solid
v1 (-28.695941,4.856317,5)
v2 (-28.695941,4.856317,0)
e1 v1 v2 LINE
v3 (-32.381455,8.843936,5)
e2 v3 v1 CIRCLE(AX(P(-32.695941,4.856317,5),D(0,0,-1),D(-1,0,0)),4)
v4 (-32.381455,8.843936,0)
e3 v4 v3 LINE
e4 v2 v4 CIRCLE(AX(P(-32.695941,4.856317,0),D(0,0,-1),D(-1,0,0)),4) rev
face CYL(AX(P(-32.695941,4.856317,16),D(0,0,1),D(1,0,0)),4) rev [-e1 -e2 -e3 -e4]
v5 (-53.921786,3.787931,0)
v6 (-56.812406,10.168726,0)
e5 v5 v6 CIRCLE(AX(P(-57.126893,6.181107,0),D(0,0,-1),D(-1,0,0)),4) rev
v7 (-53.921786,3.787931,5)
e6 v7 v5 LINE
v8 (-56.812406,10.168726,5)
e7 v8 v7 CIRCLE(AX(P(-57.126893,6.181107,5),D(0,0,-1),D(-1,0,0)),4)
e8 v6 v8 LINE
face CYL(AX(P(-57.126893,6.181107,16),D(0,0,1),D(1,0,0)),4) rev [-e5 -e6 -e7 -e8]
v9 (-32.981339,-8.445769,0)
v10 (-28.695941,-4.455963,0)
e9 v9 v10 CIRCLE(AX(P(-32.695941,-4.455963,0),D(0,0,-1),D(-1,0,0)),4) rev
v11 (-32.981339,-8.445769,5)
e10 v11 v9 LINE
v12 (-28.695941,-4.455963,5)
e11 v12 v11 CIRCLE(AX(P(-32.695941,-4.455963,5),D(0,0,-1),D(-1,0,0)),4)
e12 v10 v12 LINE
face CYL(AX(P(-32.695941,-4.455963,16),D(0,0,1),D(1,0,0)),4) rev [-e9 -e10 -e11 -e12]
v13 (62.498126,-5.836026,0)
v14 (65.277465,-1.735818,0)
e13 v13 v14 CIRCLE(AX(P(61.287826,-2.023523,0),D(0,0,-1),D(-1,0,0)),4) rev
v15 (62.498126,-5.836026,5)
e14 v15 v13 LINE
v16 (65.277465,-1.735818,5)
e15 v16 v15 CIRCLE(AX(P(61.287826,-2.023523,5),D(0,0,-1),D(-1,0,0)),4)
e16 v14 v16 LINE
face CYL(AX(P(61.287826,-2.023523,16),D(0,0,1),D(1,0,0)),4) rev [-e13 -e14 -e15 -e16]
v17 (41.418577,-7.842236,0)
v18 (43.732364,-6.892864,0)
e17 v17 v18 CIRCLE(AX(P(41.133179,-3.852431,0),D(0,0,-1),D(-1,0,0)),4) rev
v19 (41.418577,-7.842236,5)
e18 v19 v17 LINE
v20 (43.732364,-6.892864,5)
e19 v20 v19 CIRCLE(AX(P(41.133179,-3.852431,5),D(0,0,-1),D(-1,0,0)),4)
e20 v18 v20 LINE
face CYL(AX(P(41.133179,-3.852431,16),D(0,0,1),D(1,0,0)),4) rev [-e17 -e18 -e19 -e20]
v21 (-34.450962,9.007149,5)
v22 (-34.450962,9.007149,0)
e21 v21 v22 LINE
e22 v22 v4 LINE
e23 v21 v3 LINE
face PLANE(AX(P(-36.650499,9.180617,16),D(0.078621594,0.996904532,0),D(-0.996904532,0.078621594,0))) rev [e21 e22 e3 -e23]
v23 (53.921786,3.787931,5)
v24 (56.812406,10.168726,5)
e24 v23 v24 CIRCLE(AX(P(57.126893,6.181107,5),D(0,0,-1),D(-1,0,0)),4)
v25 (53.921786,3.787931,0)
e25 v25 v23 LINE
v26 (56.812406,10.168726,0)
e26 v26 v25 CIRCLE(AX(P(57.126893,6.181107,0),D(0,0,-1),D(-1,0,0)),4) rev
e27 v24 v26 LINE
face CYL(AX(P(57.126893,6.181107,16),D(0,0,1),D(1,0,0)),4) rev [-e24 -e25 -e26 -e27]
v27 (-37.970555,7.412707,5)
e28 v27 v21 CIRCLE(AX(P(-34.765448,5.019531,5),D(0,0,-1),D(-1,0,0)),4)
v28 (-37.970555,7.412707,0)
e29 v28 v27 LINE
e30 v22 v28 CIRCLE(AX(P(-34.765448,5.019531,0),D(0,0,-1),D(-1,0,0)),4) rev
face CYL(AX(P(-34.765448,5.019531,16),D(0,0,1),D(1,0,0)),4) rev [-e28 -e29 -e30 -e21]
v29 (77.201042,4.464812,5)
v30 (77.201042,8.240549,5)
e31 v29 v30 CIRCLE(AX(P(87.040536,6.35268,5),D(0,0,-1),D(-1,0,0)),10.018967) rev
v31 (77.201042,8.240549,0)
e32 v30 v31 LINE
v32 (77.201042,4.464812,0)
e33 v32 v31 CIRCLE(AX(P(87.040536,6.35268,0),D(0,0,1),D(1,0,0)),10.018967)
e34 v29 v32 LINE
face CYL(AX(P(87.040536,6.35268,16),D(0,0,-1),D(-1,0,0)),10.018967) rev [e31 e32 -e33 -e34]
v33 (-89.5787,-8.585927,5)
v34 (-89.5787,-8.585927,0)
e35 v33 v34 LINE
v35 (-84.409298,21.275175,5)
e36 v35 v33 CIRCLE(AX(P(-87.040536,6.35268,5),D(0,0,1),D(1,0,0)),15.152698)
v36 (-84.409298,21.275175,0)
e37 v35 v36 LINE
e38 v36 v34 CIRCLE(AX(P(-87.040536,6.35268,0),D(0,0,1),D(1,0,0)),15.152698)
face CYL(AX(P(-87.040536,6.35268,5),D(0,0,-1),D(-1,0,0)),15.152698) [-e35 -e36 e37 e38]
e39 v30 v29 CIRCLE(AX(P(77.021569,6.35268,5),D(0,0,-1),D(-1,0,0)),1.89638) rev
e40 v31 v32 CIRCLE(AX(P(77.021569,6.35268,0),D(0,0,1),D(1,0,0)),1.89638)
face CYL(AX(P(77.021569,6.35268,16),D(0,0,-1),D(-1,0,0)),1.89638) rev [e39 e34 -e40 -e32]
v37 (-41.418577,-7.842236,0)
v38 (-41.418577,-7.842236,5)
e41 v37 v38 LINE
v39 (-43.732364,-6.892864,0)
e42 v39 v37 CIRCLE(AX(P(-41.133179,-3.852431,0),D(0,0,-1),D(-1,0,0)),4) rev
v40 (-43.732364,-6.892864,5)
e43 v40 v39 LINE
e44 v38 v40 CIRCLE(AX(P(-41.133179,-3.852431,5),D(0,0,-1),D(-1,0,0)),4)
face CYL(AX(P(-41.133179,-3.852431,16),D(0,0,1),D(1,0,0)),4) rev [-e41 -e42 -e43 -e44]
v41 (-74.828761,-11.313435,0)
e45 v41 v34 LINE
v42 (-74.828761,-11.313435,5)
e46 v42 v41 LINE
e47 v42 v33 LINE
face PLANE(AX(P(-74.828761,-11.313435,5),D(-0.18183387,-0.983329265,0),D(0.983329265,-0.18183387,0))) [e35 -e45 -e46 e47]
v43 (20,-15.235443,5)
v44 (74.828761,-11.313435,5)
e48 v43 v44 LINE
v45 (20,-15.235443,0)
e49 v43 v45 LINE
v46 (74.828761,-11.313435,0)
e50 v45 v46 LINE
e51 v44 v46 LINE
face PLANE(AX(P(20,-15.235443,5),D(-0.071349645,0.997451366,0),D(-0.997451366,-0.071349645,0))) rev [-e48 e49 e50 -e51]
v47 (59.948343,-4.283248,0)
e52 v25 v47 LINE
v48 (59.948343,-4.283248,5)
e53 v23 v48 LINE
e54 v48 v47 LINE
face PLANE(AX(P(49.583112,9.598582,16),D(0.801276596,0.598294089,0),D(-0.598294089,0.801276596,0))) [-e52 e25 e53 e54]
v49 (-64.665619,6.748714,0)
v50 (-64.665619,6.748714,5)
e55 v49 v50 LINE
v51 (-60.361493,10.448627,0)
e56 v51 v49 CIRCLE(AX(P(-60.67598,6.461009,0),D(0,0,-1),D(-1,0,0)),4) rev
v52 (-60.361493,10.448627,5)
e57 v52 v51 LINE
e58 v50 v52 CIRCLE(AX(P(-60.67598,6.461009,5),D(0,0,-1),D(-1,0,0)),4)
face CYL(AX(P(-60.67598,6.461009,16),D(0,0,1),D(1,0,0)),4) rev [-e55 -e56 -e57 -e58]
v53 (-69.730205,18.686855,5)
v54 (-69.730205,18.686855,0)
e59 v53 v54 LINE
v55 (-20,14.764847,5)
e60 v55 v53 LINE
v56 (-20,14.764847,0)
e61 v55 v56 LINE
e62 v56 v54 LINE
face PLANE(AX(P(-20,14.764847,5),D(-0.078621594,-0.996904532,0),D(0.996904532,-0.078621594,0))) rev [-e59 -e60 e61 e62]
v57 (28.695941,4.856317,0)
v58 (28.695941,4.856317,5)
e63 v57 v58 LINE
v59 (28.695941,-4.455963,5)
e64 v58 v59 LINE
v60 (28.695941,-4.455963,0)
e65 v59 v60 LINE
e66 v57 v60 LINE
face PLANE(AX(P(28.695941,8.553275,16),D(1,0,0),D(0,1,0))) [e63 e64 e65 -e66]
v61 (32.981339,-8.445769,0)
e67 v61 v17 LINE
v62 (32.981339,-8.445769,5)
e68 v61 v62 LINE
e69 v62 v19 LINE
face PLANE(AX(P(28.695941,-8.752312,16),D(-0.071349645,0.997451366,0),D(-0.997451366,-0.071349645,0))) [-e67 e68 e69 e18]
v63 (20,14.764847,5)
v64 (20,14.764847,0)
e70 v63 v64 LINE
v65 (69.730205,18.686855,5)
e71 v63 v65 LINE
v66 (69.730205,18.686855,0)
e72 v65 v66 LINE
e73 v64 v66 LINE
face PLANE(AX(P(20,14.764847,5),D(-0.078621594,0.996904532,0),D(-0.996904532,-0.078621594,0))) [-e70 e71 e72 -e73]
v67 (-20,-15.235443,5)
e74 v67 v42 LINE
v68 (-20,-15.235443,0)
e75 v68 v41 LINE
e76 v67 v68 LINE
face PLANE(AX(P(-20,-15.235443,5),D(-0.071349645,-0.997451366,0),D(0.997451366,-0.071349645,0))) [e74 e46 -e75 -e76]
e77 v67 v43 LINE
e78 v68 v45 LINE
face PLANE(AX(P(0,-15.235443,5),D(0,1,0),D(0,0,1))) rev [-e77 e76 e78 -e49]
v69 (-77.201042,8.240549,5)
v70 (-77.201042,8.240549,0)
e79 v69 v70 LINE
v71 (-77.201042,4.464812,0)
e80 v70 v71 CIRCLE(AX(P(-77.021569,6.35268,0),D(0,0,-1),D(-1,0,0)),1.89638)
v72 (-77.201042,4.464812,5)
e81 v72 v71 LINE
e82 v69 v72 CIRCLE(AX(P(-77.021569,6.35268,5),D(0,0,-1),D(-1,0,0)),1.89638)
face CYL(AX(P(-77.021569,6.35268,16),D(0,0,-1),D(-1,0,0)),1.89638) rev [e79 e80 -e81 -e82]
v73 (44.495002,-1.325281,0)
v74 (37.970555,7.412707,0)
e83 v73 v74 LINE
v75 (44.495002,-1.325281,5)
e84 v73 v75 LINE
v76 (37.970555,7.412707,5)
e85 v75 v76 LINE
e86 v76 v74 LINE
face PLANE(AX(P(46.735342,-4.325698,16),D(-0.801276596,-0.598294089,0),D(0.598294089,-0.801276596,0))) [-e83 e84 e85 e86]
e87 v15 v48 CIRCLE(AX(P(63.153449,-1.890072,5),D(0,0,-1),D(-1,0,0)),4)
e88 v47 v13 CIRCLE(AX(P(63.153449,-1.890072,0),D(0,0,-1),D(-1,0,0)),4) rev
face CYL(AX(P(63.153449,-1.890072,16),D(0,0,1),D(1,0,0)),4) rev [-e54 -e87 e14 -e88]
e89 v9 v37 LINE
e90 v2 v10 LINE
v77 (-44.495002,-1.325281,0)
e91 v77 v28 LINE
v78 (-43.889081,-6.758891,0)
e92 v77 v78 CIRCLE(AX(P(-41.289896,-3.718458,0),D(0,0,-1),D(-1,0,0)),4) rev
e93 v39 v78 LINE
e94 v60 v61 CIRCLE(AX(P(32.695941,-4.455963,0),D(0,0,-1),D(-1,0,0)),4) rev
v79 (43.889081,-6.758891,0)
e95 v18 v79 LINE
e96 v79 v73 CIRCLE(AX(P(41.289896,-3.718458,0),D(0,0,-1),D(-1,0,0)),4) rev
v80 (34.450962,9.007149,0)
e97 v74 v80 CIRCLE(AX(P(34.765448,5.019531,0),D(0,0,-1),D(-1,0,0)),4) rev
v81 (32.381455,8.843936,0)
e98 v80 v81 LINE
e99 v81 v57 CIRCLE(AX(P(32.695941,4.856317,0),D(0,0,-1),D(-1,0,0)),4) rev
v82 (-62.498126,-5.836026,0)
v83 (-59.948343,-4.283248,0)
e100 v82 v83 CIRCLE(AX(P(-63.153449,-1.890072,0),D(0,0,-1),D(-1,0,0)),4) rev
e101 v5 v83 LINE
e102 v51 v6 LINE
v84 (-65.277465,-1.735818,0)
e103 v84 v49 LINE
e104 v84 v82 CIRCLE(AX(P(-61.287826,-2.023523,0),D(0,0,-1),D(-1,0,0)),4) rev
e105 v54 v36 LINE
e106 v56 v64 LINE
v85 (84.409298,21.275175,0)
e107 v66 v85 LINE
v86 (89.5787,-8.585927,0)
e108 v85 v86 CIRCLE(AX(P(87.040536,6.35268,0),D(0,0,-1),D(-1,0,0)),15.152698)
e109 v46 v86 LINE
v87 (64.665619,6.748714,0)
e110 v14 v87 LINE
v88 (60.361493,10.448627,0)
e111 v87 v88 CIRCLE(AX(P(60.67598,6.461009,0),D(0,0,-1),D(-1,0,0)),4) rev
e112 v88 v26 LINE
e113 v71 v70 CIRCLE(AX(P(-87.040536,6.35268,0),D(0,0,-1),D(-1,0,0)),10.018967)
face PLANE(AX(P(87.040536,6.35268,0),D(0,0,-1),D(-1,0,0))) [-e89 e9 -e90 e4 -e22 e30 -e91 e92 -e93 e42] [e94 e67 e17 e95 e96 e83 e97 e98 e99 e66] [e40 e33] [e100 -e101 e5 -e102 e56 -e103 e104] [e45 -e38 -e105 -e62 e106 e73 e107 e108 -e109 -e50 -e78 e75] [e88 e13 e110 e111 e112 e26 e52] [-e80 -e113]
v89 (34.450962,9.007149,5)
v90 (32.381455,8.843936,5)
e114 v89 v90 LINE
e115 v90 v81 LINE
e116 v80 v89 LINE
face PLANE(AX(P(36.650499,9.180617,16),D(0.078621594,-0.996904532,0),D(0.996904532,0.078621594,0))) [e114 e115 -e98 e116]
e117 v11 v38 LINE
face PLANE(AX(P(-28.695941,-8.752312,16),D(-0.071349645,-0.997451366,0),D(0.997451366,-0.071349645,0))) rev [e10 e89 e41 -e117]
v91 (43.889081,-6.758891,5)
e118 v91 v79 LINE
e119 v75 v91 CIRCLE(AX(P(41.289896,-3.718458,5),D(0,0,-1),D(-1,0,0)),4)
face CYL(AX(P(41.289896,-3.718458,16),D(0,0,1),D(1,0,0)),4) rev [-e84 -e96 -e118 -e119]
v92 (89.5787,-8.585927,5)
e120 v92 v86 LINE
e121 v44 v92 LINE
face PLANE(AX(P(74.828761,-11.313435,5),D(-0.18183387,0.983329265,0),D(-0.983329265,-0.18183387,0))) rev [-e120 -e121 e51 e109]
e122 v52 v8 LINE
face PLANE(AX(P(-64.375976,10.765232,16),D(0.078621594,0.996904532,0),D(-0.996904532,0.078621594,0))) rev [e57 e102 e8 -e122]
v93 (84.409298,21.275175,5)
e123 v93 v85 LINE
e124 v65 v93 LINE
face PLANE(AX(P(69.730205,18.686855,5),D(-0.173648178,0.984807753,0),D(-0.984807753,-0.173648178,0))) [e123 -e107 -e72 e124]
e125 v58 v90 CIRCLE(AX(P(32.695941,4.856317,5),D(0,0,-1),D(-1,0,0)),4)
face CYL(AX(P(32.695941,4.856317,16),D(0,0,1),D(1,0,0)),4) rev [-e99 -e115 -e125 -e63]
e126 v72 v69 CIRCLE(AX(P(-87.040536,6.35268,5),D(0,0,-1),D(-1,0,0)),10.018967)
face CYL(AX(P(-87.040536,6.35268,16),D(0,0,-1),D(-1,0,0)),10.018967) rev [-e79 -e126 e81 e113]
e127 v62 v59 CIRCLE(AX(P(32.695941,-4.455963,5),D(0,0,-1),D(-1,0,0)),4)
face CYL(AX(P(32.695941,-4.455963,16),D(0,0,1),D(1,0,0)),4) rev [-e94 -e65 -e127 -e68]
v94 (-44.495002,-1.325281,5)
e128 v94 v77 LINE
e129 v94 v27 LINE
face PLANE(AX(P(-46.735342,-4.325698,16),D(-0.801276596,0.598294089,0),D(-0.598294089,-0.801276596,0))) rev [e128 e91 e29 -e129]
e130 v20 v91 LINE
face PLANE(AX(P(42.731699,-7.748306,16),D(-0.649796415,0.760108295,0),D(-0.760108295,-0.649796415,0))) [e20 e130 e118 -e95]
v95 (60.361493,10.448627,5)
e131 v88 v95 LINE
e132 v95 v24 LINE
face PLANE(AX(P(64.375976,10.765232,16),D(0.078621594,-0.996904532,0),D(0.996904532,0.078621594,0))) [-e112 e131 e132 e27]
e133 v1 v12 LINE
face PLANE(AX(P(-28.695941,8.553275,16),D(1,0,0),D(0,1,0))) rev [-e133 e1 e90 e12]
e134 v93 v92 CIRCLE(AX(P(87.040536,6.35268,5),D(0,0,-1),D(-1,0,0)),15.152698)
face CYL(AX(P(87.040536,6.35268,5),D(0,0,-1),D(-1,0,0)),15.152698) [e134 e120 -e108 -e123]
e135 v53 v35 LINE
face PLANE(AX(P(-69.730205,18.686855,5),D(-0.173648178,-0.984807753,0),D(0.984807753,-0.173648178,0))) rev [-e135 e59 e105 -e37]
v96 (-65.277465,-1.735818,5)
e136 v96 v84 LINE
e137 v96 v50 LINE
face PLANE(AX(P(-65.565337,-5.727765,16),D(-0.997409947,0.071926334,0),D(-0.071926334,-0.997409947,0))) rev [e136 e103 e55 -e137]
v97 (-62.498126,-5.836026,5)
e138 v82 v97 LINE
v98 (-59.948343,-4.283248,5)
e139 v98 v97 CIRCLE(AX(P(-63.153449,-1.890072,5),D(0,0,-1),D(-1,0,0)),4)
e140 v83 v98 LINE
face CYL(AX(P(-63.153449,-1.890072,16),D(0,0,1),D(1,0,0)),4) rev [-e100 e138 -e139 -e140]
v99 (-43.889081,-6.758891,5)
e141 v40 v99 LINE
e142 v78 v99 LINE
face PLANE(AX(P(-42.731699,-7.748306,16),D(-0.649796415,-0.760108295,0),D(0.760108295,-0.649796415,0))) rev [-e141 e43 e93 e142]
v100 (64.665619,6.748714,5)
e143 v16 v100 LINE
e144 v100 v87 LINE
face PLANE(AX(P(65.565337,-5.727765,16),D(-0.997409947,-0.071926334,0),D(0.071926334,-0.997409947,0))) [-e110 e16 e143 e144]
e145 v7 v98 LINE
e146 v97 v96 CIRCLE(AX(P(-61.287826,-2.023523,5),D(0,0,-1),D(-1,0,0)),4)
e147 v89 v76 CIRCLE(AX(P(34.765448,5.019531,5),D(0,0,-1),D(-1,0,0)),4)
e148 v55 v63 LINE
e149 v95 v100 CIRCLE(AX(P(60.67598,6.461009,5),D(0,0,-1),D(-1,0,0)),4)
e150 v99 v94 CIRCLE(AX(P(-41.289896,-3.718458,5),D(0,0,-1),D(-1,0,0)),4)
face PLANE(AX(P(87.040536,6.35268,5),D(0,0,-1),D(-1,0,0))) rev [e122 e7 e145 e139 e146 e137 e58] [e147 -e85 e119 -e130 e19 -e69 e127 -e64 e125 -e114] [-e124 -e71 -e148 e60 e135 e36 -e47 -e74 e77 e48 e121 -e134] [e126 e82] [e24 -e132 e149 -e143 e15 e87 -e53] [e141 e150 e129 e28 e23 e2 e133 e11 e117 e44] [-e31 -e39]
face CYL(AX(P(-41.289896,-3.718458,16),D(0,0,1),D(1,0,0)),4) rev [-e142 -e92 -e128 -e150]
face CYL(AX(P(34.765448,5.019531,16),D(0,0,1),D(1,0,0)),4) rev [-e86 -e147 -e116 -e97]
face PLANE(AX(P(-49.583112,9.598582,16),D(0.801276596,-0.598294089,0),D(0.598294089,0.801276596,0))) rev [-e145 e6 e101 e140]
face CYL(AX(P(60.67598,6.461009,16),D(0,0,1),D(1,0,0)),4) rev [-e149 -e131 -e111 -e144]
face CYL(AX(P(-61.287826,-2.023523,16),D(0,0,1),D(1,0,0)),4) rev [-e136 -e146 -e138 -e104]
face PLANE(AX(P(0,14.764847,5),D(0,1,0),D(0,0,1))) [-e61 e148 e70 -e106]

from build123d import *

# Parameters (mm, degrees)
Y_KSEKLIK_EKSTR_ZYON3_DEPTH = 5
KES_EKSTR_ZYON3_DEPTH       = 16
RADYUS1_R                   = 4
RADYUS1_OF_AYNALAMA1_R      = 4


with BuildPart() as part:
    # Çizim1 → Yükseklik-Ekstrüzyon3 (new body)
    with BuildSketch(Plane.XY):
        with BuildLine():
            Line((0, 14.764846508), (20, 14.764846508))
            Line((20, 14.764846508), (69.730204906, 18.686854932))
            Line((69.730204906, 18.686854932), (84.409297917, 21.275175082))
            ThreePointArc((84.409297917, 21.275175082), (101.971159912, 8.937394133), (89.578700393, -8.585926971))
            Line((89.578700393, -8.585926971), (74.828761414, -11.313435014))
            Line((74.828761414, -11.313435014), (20, -15.235443437))
            Line((20, -15.235443437), (0, -15.235443437))
            Line((0, -15.235443437), (0, 0))
            Line((0, 0), (0, 14.764846508))
        make_face()
    y_kseklik_ekstr_zyon3 = extrude(amount=Y_KSEKLIK_EKSTR_ZYON3_DEPTH)

    # Çizim2 → Kes-Ekstrüzyon3 (cut)
    with BuildSketch(Plane.XY):
        Polygon((28.695940883, -8.752311503), (42.731699056, -7.748306299), (46.735341753, -4.32569838), (36.65049886, 9.180616861), (28.695940883, 8.553274918), align=None)
        Polygon((49.583112015, 9.598582086), (61.257040732, -6.035946189), (65.565337221, -5.727765324), (64.37597588, 10.765231948), align=None)
        with BuildLine():
            ThreePointArc((77.201041987, 4.464811576), (97.059503272, 6.35268034), (77.201041987, 8.240549104))
            ThreePointArc((77.201041987, 8.240549104), (75.125188984, 6.35268034), (77.201041987, 4.464811576))
        make_face()
    kes_ekstr_zyon3 = extrude(amount=KES_EKSTR_ZYON3_DEPTH, mode=Mode.SUBTRACT)

    # Radyus1
    # the kernel refuses this fillet: 4 mm, written as the material it adds along each edge
    with BuildSketch(Plane(origin=(28.695940883, -8.752311503, 0), x_dir=(0, 1, 0), z_dir=(0, 0, 1))) as radyus1_piece_1:
        with BuildLine():
            CenterArc((RADYUS1_R * 1.07408709953, -RADYUS1_R), RADYUS1_R, 90, 94.091510037)
            Line((RADYUS1_R * 0.0766357332147, -RADYUS1_R * 1.07134964497), (0, 0))
            Line((0, 0), (RADYUS1_R * 1.07408709953, 0))
        make_face()
    extrude(amount=5)
    with BuildSketch(Plane(origin=(64.37597588, 10.765231948, 0), x_dir=(-0.9969045315308735, -0.0786215938099059, 0), z_dir=(0, 0, 1))) as radyus1_piece_2:
        with BuildLine():
            CenterArc((RADYUS1_R * 1.0067369642, RADYUS1_R), RADYUS1_R, 179.615297698, 90.384702302)
            Line((RADYUS1_R * 0.00675950517271, RADYUS1_R * 1.00671427137), (0, 0))
            Line((0, 0), (RADYUS1_R * 1.0067369642, 0))
        make_face()
    extrude(amount=5)
    with BuildSketch(Plane(origin=(49.583112015, 9.598582086, 0), x_dir=(0.9969045315308733, 0.07862159380990602, 0), z_dir=(0, 0, 1))) as radyus1_piece_3:
        with BuildLine():
            CenterArc((RADYUS1_R * 1.81293545135, -RADYUS1_R), RADYUS1_R, 90, 122.238478949)
            Line((RADYUS1_R * 0.967100347397, -RADYUS1_R * 1.53344444595), (0, 0))
            Line((0, 0), (RADYUS1_R * 1.81293545135, 0))
        make_face()
    extrude(amount=5)
    with BuildSketch(Plane(origin=(65.565337221, -5.727765324, 0), x_dir=(-0.07192633405101899, 0.9974099470478431, 0), z_dir=(0, 0, 1))) as radyus1_piece_4:
        with BuildLine():
            CenterArc((RADYUS1_R * 1.0005783418, RADYUS1_R), RADYUS1_R, 179.966873036, 90.033126964)
            Line((RADYUS1_R * 0.000578508947597, RADYUS1_R * 1.00057817457), (0, 0))
            Line((0, 0), (RADYUS1_R * 1.0005783418, 0))
        make_face()
    extrude(amount=5)
    with BuildSketch(Plane(origin=(46.735341753, -4.32569838, 0), x_dir=(-0.5982940894650627, 0.8012765955094231, 0), z_dir=(0, 0, 1))) as radyus1_piece_5:
        with BuildLine():
            CenterArc((RADYUS1_R * 0.936136482984, RADYUS1_R), RADYUS1_R, 183.778435906, 86.221564094)
            Line((-RADYUS1_R * 0.0616898577771, RADYUS1_R * 0.934101641269), (0, 0))
            Line((0, 0), (RADYUS1_R * 0.936136482984, 0))
        make_face()
    extrude(amount=5)
    with BuildSketch(Plane(origin=(36.65049886, 9.180616861, 0), x_dir=(-0.9969045315308735, -0.07862159380990552, 0), z_dir=(0, 0, 1))) as radyus1_piece_6:
        with BuildLine():
            CenterArc((RADYUS1_R * 0.551591618585, RADYUS1_R), RADYUS1_R, 212.238478949, 57.761521051)
            Line((-RADYUS1_R * 0.294243485369, RADYUS1_R * 0.466555554046), (0, 0))
            Line((0, 0), (RADYUS1_R * 0.551591618585, 0))
        make_face()
    extrude(amount=5)
    with BuildSketch(Plane(origin=(28.695940883, 8.553274918, 0), x_dir=(0, -1, 0), z_dir=(0, 0, 1))) as radyus1_piece_7:
        with BuildLine():
            CenterArc((RADYUS1_R * 0.924239359987, RADYUS1_R), RADYUS1_R, 184.509339304, 85.490660696)
            Line((-RADYUS1_R * 0.072665171544, RADYUS1_R * 0.92137840619), (0, 0))
            Line((0, 0), (RADYUS1_R * 0.924239359987, 0))
        make_face()
    extrude(amount=5)
    with BuildSketch(Plane(origin=(42.731699056, -7.748306299, 0), x_dir=(0.7601082947002393, 0.6497964145237292, 0), z_dir=(0, 0, 1))) as radyus1_piece_8:
        with BuildLine():
            CenterArc((RADYUS1_R * 0.32911927964, RADYUS1_R), RADYUS1_R, 233.565255877, 36.434744123)
            Line((-RADYUS1_R * 0.26478758489, RADYUS1_R * 0.195466199427), (0, 0))
            Line((0, 0), (RADYUS1_R * 0.32911927964, 0))
        make_face()
    extrude(amount=5)
    with BuildSketch(Plane(origin=(61.257040732, -6.035946189, 0), x_dir=(0.9974513663147319, 0.07134964496670383, 0), z_dir=(0, 0, 1))) as radyus1_piece_9:
        with BuildLine():
            CenterArc((RADYUS1_R * 0.546845511805, RADYUS1_R), RADYUS1_R, 212.656308216, 57.343691784)
            Line((-RADYUS1_R * 0.295076994051, RADYUS1_R * 0.460401543615), (0, 0))
            Line((0, 0), (RADYUS1_R * 0.546845511805, 0))
        make_face()
    extrude(amount=5)

    # Aynalama1: Yükseklik-Ekstrüzyon3, Kes-Ekstrüzyon3 across plane
    add(y_kseklik_ekstr_zyon3.mirror(Plane(origin=(0, 0, 5), x_dir=(0, 0, 1), z_dir=(1, 0, 0))))
    add(kes_ekstr_zyon3.mirror(Plane(origin=(0, 0, 5), x_dir=(0, 0, 1), z_dir=(1, 0, 0))), mode=Mode.SUBTRACT)

    # Radyus1 of Aynalama1
    # the kernel refuses this fillet: 4 mm, written as the material it adds along each edge
    with BuildSketch(Plane(origin=(-28.695940883, -8.752311503, 0), x_dir=(-0.9974513663147319, 0.07134964496670435, 0), z_dir=(0, 0, 1))) as radyus1_of_aynalama1_piece_1:
        with BuildLine():
            CenterArc((RADYUS1_OF_AYNALAMA1_R * 1.07408709953, -RADYUS1_OF_AYNALAMA1_R), RADYUS1_OF_AYNALAMA1_R, 90, 94.091510037)
            Line((RADYUS1_OF_AYNALAMA1_R * 0.0766357332147, -RADYUS1_OF_AYNALAMA1_R * 1.07134964497), (0, 0))
            Line((0, 0), (RADYUS1_OF_AYNALAMA1_R * 1.07408709953, 0))
        make_face()
    extrude(amount=5)
    with BuildSketch(Plane(origin=(-64.37597588, 10.765231948, 0), x_dir=(-0.07192633405101888, -0.9974099470478431, 0), z_dir=(0, 0, 1))) as radyus1_of_aynalama1_piece_2:
        with BuildLine():
            CenterArc((RADYUS1_OF_AYNALAMA1_R * 1.0067369642, RADYUS1_OF_AYNALAMA1_R), RADYUS1_OF_AYNALAMA1_R, 179.615297698, 90.384702302)
            Line((RADYUS1_OF_AYNALAMA1_R * 0.00675950517271, RADYUS1_OF_AYNALAMA1_R * 1.00671427137), (0, 0))
            Line((0, 0), (RADYUS1_OF_AYNALAMA1_R * 1.0067369642, 0))
        make_face()
    extrude(amount=5)
    with BuildSketch(Plane(origin=(-49.583112015, 9.598582086, 0), x_dir=(-0.5982940894650629, -0.801276595509423, 0), z_dir=(0, 0, 1))) as radyus1_of_aynalama1_piece_3:
        with BuildLine():
            CenterArc((RADYUS1_OF_AYNALAMA1_R * 1.81293545135, -RADYUS1_OF_AYNALAMA1_R), RADYUS1_OF_AYNALAMA1_R, 90, 122.238478949)
            Line((RADYUS1_OF_AYNALAMA1_R * 0.967100347397, -RADYUS1_OF_AYNALAMA1_R * 1.53344444595), (0, 0))
            Line((0, 0), (RADYUS1_OF_AYNALAMA1_R * 1.81293545135, 0))
        make_face()
    extrude(amount=5)
    with BuildSketch(Plane(origin=(-65.565337221, -5.727765324, 0), x_dir=(0.9974513663147317, -0.07134964496670429, 0), z_dir=(0, 0, 1))) as radyus1_of_aynalama1_piece_4:
        with BuildLine():
            CenterArc((RADYUS1_OF_AYNALAMA1_R * 1.0005783418, RADYUS1_OF_AYNALAMA1_R), RADYUS1_OF_AYNALAMA1_R, 179.966873036, 90.033126964)
            Line((RADYUS1_OF_AYNALAMA1_R * 0.000578508947597, RADYUS1_OF_AYNALAMA1_R * 1.00057817457), (0, 0))
            Line((0, 0), (RADYUS1_OF_AYNALAMA1_R * 1.0005783418, 0))
        make_face()
    extrude(amount=5)
    with BuildSketch(Plane(origin=(-46.735341753, -4.32569838, 0), x_dir=(0.7601082947002414, -0.6497964145237266, 0), z_dir=(0, 0, 1))) as radyus1_of_aynalama1_piece_5:
        with BuildLine():
            CenterArc((RADYUS1_OF_AYNALAMA1_R * 0.936136482984, RADYUS1_OF_AYNALAMA1_R), RADYUS1_OF_AYNALAMA1_R, 183.778435906, 86.221564094)
            Line((-RADYUS1_OF_AYNALAMA1_R * 0.0616898577771, RADYUS1_OF_AYNALAMA1_R * 0.934101641269), (0, 0))
            Line((0, 0), (RADYUS1_OF_AYNALAMA1_R * 0.936136482984, 0))
        make_face()
    extrude(amount=5)
    with BuildSketch(Plane(origin=(-36.65049886, 9.180616861, 0), x_dir=(-0.5982940894650631, -0.8012765955094229, 0), z_dir=(0, 0, 1))) as radyus1_of_aynalama1_piece_6:
        with BuildLine():
            CenterArc((RADYUS1_OF_AYNALAMA1_R * 0.551591618585, RADYUS1_OF_AYNALAMA1_R), RADYUS1_OF_AYNALAMA1_R, 212.238478949, 57.761521051)
            Line((-RADYUS1_OF_AYNALAMA1_R * 0.294243485369, RADYUS1_OF_AYNALAMA1_R * 0.466555554046), (0, 0))
            Line((0, 0), (RADYUS1_OF_AYNALAMA1_R * 0.551591618585, 0))
        make_face()
    extrude(amount=5)
    with BuildSketch(Plane(origin=(-28.695940883, 8.553274918, 0), x_dir=(-0.9969045315308733, 0.07862159380990529, 0), z_dir=(0, 0, 1))) as radyus1_of_aynalama1_piece_7:
        with BuildLine():
            CenterArc((RADYUS1_OF_AYNALAMA1_R * 0.924239359987, RADYUS1_OF_AYNALAMA1_R), RADYUS1_OF_AYNALAMA1_R, 184.509339304, 85.490660696)
            Line((-RADYUS1_OF_AYNALAMA1_R * 0.072665171544, RADYUS1_OF_AYNALAMA1_R * 0.92137840619), (0, 0))
            Line((0, 0), (RADYUS1_OF_AYNALAMA1_R * 0.924239359987, 0))
        make_face()
    extrude(amount=5)
    with BuildSketch(Plane(origin=(-42.731699056, -7.748306299, 0), x_dir=(0.9974513663147319, -0.07134964496670414, 0), z_dir=(0, 0, 1))) as radyus1_of_aynalama1_piece_8:
        with BuildLine():
            CenterArc((RADYUS1_OF_AYNALAMA1_R * 0.32911927964, RADYUS1_OF_AYNALAMA1_R), RADYUS1_OF_AYNALAMA1_R, 233.565255877, 36.434744123)
            Line((-RADYUS1_OF_AYNALAMA1_R * 0.26478758489, RADYUS1_OF_AYNALAMA1_R * 0.195466199427), (0, 0))
            Line((0, 0), (RADYUS1_OF_AYNALAMA1_R * 0.32911927964, 0))
        make_face()
    extrude(amount=5)
    with BuildSketch(Plane(origin=(-61.257040732, -6.035946189, 0), x_dir=(0.5982940894650642, 0.8012765955094219, 0), z_dir=(0, 0, 1))) as radyus1_of_aynalama1_piece_9:
        with BuildLine():
            CenterArc((RADYUS1_OF_AYNALAMA1_R * 0.546845511805, RADYUS1_OF_AYNALAMA1_R), RADYUS1_OF_AYNALAMA1_R, 212.656308216, 57.343691784)
            Line((-RADYUS1_OF_AYNALAMA1_R * 0.295076994051, RADYUS1_OF_AYNALAMA1_R * 0.460401543615), (0, 0))
            Line((0, 0), (RADYUS1_OF_AYNALAMA1_R * 0.546845511805, 0))
        make_face()
    extrude(amount=5)


solid = part.part
